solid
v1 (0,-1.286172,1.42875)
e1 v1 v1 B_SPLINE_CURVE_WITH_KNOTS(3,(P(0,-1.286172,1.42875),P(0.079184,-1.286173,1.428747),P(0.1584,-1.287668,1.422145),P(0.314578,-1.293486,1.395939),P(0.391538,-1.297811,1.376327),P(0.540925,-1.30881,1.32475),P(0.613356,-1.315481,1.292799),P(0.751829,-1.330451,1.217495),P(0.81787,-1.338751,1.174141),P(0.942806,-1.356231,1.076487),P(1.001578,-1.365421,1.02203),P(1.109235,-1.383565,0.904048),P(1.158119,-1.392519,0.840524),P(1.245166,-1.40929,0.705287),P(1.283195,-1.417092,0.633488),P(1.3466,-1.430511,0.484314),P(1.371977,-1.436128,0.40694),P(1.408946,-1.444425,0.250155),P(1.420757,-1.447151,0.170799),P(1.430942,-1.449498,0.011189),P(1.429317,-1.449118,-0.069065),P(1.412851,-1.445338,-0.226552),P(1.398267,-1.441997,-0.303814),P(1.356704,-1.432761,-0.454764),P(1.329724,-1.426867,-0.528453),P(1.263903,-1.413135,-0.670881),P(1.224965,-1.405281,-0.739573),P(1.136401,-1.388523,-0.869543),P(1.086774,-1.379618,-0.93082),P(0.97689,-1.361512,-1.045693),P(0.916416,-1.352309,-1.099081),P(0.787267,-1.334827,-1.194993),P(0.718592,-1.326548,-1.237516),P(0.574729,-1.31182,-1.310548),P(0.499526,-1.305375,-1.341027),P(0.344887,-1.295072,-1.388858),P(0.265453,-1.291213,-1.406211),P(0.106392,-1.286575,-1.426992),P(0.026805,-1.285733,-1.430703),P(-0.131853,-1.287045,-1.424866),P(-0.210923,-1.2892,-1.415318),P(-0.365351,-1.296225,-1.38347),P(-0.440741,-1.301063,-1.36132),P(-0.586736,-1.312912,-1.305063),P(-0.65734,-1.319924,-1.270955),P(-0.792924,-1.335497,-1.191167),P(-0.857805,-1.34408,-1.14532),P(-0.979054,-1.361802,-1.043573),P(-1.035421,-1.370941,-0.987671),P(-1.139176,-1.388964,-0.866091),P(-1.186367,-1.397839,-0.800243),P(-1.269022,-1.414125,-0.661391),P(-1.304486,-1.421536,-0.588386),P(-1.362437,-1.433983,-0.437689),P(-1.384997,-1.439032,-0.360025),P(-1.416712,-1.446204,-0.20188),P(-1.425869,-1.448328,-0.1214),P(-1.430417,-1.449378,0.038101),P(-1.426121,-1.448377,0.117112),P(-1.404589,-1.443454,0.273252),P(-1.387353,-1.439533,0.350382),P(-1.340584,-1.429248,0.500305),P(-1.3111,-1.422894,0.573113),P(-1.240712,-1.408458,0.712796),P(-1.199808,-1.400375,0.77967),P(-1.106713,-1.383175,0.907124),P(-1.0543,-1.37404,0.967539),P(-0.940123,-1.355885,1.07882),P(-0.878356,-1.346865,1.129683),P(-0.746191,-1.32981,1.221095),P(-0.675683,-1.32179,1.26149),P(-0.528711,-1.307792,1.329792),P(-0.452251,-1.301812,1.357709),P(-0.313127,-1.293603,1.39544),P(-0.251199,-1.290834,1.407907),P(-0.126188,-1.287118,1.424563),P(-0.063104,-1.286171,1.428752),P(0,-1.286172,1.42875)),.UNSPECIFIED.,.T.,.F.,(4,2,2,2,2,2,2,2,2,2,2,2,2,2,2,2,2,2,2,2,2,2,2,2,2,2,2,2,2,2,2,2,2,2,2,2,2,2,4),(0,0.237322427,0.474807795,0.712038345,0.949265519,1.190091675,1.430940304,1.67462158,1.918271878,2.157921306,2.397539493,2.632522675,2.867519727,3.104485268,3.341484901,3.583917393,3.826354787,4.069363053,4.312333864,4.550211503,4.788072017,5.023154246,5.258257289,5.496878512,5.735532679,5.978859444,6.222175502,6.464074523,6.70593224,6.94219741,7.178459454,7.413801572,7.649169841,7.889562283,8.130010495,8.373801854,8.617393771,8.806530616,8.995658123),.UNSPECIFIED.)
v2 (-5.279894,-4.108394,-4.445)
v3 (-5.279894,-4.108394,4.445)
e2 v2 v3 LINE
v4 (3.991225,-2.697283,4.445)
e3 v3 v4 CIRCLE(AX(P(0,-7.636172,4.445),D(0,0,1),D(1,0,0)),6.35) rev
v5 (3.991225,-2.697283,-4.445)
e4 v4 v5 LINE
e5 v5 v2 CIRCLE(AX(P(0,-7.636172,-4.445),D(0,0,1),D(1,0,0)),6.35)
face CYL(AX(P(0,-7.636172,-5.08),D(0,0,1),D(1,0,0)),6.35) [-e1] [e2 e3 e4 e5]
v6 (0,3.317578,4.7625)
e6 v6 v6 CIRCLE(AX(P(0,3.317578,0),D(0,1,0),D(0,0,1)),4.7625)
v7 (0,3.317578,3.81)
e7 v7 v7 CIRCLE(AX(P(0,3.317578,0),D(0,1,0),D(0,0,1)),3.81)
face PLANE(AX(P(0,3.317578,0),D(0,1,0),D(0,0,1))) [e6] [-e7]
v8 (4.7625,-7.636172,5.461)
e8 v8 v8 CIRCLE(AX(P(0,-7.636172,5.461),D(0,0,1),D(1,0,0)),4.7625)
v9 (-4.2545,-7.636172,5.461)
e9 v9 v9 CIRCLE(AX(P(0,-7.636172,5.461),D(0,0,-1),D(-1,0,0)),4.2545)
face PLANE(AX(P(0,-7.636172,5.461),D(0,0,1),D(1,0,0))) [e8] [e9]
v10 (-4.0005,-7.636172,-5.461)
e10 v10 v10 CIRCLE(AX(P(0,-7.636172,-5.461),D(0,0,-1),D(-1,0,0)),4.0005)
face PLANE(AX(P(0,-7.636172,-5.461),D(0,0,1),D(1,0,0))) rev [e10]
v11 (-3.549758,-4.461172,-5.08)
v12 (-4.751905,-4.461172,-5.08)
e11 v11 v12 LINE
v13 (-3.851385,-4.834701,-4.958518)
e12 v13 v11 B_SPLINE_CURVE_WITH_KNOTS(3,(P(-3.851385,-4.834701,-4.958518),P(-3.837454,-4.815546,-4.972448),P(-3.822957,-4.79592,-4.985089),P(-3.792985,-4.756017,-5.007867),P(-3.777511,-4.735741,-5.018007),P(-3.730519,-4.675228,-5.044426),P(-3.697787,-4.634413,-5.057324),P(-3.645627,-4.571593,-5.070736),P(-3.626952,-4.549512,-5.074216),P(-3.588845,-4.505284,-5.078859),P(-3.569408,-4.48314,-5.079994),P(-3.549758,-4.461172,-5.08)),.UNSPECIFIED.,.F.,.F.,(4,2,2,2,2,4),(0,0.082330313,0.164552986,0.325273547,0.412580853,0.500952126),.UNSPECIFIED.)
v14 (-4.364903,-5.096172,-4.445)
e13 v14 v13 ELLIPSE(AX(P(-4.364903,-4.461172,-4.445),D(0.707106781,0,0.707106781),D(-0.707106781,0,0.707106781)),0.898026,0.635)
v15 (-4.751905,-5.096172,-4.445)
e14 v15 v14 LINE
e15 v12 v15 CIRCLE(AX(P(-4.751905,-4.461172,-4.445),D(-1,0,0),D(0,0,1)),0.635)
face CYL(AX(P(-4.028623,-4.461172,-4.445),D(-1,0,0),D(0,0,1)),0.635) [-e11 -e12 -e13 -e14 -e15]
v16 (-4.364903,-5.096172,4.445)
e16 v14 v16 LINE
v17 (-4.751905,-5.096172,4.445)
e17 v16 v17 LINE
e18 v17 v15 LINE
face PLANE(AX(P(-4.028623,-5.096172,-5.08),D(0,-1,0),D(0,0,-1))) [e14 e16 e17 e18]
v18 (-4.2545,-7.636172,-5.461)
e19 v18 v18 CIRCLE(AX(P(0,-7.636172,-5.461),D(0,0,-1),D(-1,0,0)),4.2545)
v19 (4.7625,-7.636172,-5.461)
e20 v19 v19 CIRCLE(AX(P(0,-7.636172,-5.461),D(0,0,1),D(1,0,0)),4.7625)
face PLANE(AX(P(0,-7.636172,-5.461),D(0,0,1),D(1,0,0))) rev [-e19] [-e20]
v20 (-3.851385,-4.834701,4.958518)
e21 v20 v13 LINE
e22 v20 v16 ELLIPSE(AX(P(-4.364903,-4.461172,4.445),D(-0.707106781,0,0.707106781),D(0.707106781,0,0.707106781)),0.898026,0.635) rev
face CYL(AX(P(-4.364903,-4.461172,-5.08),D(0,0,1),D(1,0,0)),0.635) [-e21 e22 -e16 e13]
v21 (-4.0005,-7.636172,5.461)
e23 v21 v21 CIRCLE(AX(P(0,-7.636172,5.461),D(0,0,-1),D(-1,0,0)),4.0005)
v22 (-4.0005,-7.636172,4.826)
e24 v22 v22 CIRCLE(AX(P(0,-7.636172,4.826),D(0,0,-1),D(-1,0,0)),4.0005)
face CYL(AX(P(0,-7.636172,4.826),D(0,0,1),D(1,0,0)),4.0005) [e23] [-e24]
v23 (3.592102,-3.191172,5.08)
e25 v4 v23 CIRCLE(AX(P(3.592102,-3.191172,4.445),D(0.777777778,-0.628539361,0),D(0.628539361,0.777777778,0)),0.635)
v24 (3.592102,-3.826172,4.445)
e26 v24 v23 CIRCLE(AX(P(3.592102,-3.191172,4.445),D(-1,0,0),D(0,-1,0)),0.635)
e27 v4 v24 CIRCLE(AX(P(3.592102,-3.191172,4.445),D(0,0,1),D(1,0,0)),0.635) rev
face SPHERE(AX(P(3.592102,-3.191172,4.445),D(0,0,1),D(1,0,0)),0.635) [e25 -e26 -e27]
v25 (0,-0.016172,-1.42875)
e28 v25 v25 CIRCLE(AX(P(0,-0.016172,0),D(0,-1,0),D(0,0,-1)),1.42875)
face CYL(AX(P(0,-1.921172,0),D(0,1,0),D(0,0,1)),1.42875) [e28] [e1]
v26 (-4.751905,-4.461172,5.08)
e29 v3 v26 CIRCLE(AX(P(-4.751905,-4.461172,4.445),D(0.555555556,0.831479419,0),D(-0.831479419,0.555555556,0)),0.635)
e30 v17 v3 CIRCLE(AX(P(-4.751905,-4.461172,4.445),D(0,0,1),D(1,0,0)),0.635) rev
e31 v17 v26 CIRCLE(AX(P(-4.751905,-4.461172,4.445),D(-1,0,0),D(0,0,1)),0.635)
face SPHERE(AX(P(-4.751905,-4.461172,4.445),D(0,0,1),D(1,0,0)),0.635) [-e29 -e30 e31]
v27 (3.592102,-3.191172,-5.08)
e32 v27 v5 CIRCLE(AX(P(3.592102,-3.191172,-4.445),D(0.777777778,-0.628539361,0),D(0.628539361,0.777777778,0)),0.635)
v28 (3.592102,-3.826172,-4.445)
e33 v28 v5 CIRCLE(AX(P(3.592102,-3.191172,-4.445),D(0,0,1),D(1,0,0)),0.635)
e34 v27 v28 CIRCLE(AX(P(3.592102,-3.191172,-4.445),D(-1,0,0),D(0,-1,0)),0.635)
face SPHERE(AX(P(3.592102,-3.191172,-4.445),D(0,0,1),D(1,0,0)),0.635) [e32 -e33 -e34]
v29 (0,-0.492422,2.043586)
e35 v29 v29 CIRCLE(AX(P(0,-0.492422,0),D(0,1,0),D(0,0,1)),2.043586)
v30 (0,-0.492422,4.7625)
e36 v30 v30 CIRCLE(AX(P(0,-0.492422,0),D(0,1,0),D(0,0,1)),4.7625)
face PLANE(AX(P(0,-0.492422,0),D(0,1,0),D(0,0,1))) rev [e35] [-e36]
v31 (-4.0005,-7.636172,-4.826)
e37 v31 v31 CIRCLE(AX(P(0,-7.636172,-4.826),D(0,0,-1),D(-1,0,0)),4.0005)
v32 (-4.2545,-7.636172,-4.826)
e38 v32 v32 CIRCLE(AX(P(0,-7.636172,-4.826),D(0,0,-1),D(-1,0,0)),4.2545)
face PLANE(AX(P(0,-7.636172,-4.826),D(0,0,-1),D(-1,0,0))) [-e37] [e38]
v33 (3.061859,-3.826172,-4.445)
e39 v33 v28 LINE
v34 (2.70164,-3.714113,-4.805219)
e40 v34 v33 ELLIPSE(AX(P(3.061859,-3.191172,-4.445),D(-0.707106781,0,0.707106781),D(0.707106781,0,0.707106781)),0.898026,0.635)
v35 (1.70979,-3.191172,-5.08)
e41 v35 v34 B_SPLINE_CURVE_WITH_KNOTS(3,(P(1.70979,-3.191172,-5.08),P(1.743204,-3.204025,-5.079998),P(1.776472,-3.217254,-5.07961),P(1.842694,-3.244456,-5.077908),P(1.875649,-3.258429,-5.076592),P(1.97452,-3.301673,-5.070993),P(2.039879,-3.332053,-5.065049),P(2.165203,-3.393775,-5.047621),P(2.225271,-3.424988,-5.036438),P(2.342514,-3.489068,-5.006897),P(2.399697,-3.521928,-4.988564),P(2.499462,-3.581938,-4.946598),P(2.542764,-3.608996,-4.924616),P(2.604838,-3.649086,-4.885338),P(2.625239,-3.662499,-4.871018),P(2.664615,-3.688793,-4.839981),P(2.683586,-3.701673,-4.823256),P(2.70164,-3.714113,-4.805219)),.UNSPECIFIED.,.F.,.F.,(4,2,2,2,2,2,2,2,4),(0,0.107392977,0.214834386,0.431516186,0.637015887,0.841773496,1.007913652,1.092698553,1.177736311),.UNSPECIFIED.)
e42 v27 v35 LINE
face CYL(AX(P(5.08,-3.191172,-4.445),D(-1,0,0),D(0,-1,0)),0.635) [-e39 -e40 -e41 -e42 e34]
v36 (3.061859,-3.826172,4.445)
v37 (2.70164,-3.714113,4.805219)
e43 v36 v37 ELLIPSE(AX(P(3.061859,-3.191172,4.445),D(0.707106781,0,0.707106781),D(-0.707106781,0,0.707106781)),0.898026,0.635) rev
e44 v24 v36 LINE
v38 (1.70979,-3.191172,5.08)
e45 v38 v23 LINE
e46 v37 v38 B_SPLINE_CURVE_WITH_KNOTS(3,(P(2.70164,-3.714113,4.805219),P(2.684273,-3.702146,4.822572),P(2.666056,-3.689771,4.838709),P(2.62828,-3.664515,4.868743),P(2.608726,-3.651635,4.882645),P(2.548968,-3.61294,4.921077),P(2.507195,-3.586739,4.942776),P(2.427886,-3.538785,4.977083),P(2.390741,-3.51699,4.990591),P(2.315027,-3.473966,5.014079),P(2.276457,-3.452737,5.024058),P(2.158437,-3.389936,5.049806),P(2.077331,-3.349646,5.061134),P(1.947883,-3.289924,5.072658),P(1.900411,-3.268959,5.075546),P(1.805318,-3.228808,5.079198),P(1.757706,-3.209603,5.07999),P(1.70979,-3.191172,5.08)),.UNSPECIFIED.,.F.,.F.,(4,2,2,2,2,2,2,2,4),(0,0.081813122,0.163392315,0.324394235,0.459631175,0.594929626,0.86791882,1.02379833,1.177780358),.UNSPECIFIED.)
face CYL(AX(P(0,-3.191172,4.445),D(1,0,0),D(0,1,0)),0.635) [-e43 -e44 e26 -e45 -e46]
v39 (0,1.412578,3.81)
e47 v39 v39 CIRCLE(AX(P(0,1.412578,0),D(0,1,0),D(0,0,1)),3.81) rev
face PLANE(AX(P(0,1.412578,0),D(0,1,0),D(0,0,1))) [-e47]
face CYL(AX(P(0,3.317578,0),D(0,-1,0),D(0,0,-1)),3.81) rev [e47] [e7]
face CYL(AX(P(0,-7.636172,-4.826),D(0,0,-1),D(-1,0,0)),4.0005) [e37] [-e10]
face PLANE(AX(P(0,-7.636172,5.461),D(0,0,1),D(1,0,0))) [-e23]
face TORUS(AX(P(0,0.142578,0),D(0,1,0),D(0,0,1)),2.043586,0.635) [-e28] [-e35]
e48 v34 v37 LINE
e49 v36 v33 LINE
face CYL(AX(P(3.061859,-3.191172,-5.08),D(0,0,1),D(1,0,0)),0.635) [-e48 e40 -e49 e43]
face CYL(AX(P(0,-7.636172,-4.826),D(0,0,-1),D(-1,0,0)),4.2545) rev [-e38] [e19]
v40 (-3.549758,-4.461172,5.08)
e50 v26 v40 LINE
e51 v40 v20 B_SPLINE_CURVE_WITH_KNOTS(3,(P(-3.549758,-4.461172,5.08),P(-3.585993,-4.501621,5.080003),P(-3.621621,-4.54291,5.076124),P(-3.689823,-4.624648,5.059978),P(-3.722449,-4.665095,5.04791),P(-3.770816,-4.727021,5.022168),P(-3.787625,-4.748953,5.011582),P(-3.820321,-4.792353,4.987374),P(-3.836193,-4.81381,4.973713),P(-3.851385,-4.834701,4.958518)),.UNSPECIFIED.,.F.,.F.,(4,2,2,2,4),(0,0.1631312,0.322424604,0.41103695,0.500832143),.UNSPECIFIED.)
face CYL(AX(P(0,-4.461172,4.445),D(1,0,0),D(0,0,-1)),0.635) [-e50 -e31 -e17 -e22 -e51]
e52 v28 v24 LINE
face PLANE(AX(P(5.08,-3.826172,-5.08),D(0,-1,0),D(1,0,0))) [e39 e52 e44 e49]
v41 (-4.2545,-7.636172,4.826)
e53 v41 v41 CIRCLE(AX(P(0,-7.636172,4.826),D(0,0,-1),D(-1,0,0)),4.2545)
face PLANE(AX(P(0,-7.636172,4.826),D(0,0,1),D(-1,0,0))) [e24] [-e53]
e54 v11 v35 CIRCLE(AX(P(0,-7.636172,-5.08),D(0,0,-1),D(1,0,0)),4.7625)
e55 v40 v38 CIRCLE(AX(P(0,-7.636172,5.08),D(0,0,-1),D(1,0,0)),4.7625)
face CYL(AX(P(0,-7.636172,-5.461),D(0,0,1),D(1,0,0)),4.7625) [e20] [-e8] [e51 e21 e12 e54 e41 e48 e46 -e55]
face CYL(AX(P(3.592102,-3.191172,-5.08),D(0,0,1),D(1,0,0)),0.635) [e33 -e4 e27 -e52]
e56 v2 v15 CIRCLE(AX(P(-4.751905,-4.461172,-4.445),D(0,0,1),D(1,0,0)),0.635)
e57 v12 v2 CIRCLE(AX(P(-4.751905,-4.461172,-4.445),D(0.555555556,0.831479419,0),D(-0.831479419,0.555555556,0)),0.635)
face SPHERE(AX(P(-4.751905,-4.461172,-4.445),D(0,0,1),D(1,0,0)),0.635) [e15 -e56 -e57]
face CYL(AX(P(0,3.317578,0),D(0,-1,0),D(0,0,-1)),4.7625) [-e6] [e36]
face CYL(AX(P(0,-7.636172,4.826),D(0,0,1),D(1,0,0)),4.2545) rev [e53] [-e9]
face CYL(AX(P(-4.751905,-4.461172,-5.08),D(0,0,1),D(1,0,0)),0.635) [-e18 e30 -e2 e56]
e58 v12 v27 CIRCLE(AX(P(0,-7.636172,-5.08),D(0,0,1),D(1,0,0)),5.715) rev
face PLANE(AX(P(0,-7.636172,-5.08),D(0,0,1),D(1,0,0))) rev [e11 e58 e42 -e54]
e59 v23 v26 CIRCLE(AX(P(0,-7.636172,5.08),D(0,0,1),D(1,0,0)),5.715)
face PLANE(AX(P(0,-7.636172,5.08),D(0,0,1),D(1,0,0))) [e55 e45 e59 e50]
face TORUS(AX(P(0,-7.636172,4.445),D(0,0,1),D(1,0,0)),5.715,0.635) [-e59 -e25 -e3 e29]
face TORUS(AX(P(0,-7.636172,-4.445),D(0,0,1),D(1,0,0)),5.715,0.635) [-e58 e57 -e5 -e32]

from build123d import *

# Parameters (mm, degrees)
SKETCH1_R                = 2.54
BOSS_EXTRUDE1_DEPTH      = 1.27
SKETCH2_R                = 3.175
SKETCH2_R_2              = 2.54
BOSS_EXTRUDE2_DEPTH      = 2.54
SKETCH3_R                = 0.9525
CUT_EXTRUDE1_DEPTH       = 0.3175
SCALE1_SCALE             = 1.5
FILLET1_R                = 0.635
SKETCH5_R                = 1.42875
BOSS_EXTRUDE3_DEPTH      = 1.905
BOSS_EXTRUDE4_DEPTH      = 5.08
BOSS_EXTRUDE4_DEPTH_BACK = 5.08
FILLET2_R                = 0.635
BOSS_EXTRUDE5_DEPTH      = 5.461
BOSS_EXTRUDE5_DEPTH_BACK = 5.461
SKETCH9_R                = 4.7625
SKETCH10_R               = 4.2545
SKETCH10_R_2             = 4.0005
CUT_EXTRUDE3_DEPTH       = 0.635
FILLET3_R                = 0.635


with BuildPart() as part:
    # Sketch1 → Boss-Extrude1 (new body)
    with BuildSketch(Plane(origin=(0, 0, 0), x_dir=(1, 0, 0), z_dir=(0, 1, 0))):
        with Locations(Location((0, 0, 0), (0, 0, 270))):
            Circle(SKETCH1_R)
    extrude(amount=BOSS_EXTRUDE1_DEPTH)

    # Sketch2 → Boss-Extrude2 (add)
    with BuildSketch(Plane(origin=(0, 0, 0), x_dir=(1, 0, 0), z_dir=(0, 1, 0))):
        with Locations(Location((0, 0, 0), (0, 0, 270))):
            Circle(SKETCH2_R)
        with Locations(Location((0, 0, 0), (0, 0, 270))):
            Circle(SKETCH2_R_2, mode=Mode.SUBTRACT)
    extrude(amount=BOSS_EXTRUDE2_DEPTH)

    # Sketch3 → Cut-Extrude1 (cut)
    with BuildSketch(Plane.XZ):
        with Locations(Location((0, 0, 0), (0, 0, 270))):
            Circle(SKETCH3_R)
    extrude(amount=-CUT_EXTRUDE1_DEPTH, mode=Mode.SUBTRACT)


with BuildPart() as part_1:
    # Scale1: scaled about (0, 0.984843458, 0)
    add(part.part.scale(SCALE1_SCALE).moved(Location((0, -0.492421729, 0))))

    # Fillet1
    # the kernel refuses this fillet: 0.635 mm, written as the material it takes off along each edge
    with BuildSketch(Plane(origin=(0, -0.492421729, 0), x_dir=(0, 0, -1), z_dir=(-1, 0, 0))) as fillet1_piece_1:
        with BuildLine():
            CenterArc((2.043586106, -0.635), FILLET1_R, 90, 75.522487814)
            Line((1.42875, -0.47625), (1.416453278, -0.473075))
            ThreePointArc((1.416453278, -0.473075), (1.41605, -0.238125), (1.41605, 0))
            Line((1.41605, 0), (1.42875, 0.0127))
            Line((1.42875, 0.0127), (2.043586106, 0.0127))
            Line((2.043586106, 0.0127), (2.043586106, 0))
        make_face()
    revolve(axis=Axis((0, -0.492421729, 0), (0, -1, 0)), mode=Mode.SUBTRACT)

    # Sketch5 → Boss-Extrude3 (add)
    with BuildSketch(Plane.XZ.offset(0.016171729)):
        with Locations(Location((0, 0, 0), (0, 0, 90))):
            Circle(SKETCH5_R)
    extrude(amount=BOSS_EXTRUDE3_DEPTH)

    # Sketch7 → Boss-Extrude4 (add, two sides: drawn at the far end of the back side and taken through both)
    with BuildSketch(Plane.XY.offset(-BOSS_EXTRUDE4_DEPTH_BACK)):
        with BuildLine():
            Line((5.08, -3.826171729), (2.8575, -3.826171729))
            ThreePointArc((2.8575, -3.826171729), (-0.863775136, -2.952658223), (-4.028623369, -5.096171729))
            Line((-4.028623369, -5.096171729), (-5.819871133, -5.096171729))
            ThreePointArc((-5.819871133, -5.096171729), (-0.734899533, -1.328840861), (5.08, -3.826171729))
        make_face()
    extrude(amount=BOSS_EXTRUDE4_DEPTH + BOSS_EXTRUDE4_DEPTH_BACK)

    # Fillet2
    fillet2_edges = [part_1.edges().sort_by_distance(p)[0] for p in [
        (-5.819871133, -5.096171729, 0),
        (5.08, -3.826171729, 0),
        (2.8575, -3.826171729, 0),
        (-4.028623369, -5.096171729, 0),
    ]]
    fillet(fillet2_edges, radius=FILLET2_R)

    # Sketch9 → Boss-Extrude5 (add, two sides: drawn at the far end of the back side and taken through both)
    with BuildSketch(Plane.XY.offset(-BOSS_EXTRUDE5_DEPTH_BACK)):
        with Locations((0, -7.636171729)):
            Circle(SKETCH9_R)
    extrude(amount=BOSS_EXTRUDE5_DEPTH + BOSS_EXTRUDE5_DEPTH_BACK)

    # Sketch10 → Cut-Extrude3 (cut)
    with BuildSketch(Plane(origin=(0, 0, -5.461), x_dir=(-1, 0, 0), z_dir=(0, 0, -1))):
        with Locations((0, -7.636171729)):
            Circle(SKETCH10_R)
        with Locations((0, -7.636171729)):
            Circle(SKETCH10_R_2, mode=Mode.SUBTRACT)
    cut_extrude3 = extrude(amount=-CUT_EXTRUDE3_DEPTH, mode=Mode.SUBTRACT)

    # Mirror1: Cut-Extrude3 across plane
    add(cut_extrude3.mirror(Plane.XY), mode=Mode.SUBTRACT)

    # Fillet3
    # the kernel refuses this fillet: 0.635 mm, written as the material it takes off along each edge
    with BuildSketch(Plane(origin=(3.592102448, -3.826171729, 5.08), x_dir=(0, 1, 0), z_dir=(-1, 0, 0))) as fillet3_piece_1_section:
        with BuildLine():
            CenterArc((FILLET3_R, FILLET3_R), FILLET3_R, 180, 90)
            Line((0, FILLET3_R), (0, 0))
            Line((0, 0), (FILLET3_R, 0))
        make_face()
    fillet3_piece_1 = extrude(amount=2.117743332, mode=Mode.PRIVATE)
    fillet3_piece_1 = fillet3_piece_1 - Plane(origin=(0, -7.636171729, 5.008990652), x_dir=(1, 0, 0), z_dir=(0, 0, -1)) * Cylinder(4.7625, 7, mode=Mode.PRIVATE)
    add(fillet3_piece_1, mode=Mode.SUBTRACT)
    with BuildSketch(Plane(origin=(3.592102448, -3.191171729, 5.08), x_dir=(0.6285393610547108, 0.7777777777777762, 0), z_dir=(-0.7777777777777762, 0.6285393610547108, 0))) as fillet3_piece_2:
        with BuildLine():
            CenterArc((0.635 - FILLET3_R, FILLET3_R), FILLET3_R, 270, 90)
            Line((0.635, FILLET3_R), (0.635, 0))
            Line((0.635, 0), (0.635 - FILLET3_R, 0))
        make_face()
    revolve(axis=Axis((3.592102448, -3.191171729, 5.08), (0, 0, -1)), revolution_arc=141.057558731, mode=Mode.SUBTRACT)
    with BuildSketch(Plane(origin=(-2.777403349, -5.096171729, 5.08), x_dir=(0, 1, 0), z_dir=(-1, 0, 0))) as fillet3_piece_3_section:
        with BuildLine():
            CenterArc((FILLET3_R, FILLET3_R), FILLET3_R, 180, 90)
            Line((0, FILLET3_R), (0, 0))
            Line((0, 0), (FILLET3_R, 0))
        make_face()
    fillet3_piece_3 = extrude(amount=1.974501532, mode=Mode.PRIVATE)
    fillet3_piece_3 = fillet3_piece_3 - Plane(origin=(0, -7.636171729, 4.983808313), x_dir=(1, 0, 0), z_dir=(0, 0, -1)) * Cylinder(4.7625, 7, mode=Mode.PRIVATE)
    add(fillet3_piece_3, mode=Mode.SUBTRACT)
    with BuildSketch(Plane(origin=(-4.751904881, -4.461171729, 5.08), x_dir=(-0.8314794192830989, 0.5555555555555544, 0), z_dir=(0.5555555555555544, 0.8314794192830989, 0))) as fillet3_piece_4:
        with BuildLine():
            CenterArc((0.635 - FILLET3_R, -FILLET3_R), FILLET3_R, 0, 90)
            Line((0.635, -FILLET3_R), (0.635, 0))
            Line((0.635, 0), (0.635 - FILLET3_R, 0))
        make_face()
    revolve(axis=Axis((-4.751904881, -4.461171729, 5.08), (0, 0, 1)), revolution_arc=123.748988596, mode=Mode.SUBTRACT)
    with BuildSketch(Plane(origin=(3.592102448, -3.826171729, -5.08), x_dir=(0, 1, 0), z_dir=(-1, 0, 0))) as fillet3_piece_5_section:
        with BuildLine():
            CenterArc((FILLET3_R, -FILLET3_R), FILLET3_R, 90, 90)
            Line((0, -FILLET3_R), (0, 0))
            Line((0, 0), (FILLET3_R, 0))
        make_face()
    fillet3_piece_5 = extrude(amount=2.117743332, mode=Mode.PRIVATE)
    fillet3_piece_5 = fillet3_piece_5 - Plane(origin=(0, -7.636171729, -5.008990652), x_dir=(1, 0, 0), z_dir=(0, 0, -1)) * Cylinder(4.7625, 7, mode=Mode.PRIVATE)
    add(fillet3_piece_5, mode=Mode.SUBTRACT)
    with BuildSketch(Plane(origin=(3.592102448, -3.191171729, -5.08), x_dir=(0.6285393610547108, 0.7777777777777762, 0), z_dir=(-0.7777777777777762, 0.6285393610547108, 0))) as fillet3_piece_6:
        with BuildLine():
            CenterArc((0.635 - FILLET3_R, -FILLET3_R), FILLET3_R, 0, 90)
            Line((0.635 - FILLET3_R, 0), (0.635, 0))
            Line((0.635, 0), (0.635, -FILLET3_R))
        make_face()
    revolve(axis=Axis((3.592102448, -3.191171729, -5.08), (0, 0, -1)), revolution_arc=141.057558731, mode=Mode.SUBTRACT)
    with BuildSketch(Plane(origin=(-2.777403349, -5.096171729, -5.08), x_dir=(0, 1, 0), z_dir=(-1, 0, 0))) as fillet3_piece_7_section:
        with BuildLine():
            CenterArc((FILLET3_R, -FILLET3_R), FILLET3_R, 90, 90)
            Line((0, -FILLET3_R), (0, 0))
            Line((0, 0), (FILLET3_R, 0))
        make_face()
    fillet3_piece_7 = extrude(amount=1.974501532, mode=Mode.PRIVATE)
    fillet3_piece_7 = fillet3_piece_7 - Plane(origin=(0, -7.636171729, -4.983808313), x_dir=(1, 0, 0), z_dir=(0, 0, -1)) * Cylinder(4.7625, 7, mode=Mode.PRIVATE)
    add(fillet3_piece_7, mode=Mode.SUBTRACT)
    with BuildSketch(Plane(origin=(-4.751904881, -4.461171729, -5.08), x_dir=(-0.8314794192830989, 0.5555555555555544, 0), z_dir=(0.5555555555555544, 0.8314794192830989, 0))) as fillet3_piece_8:
        with BuildLine():
            CenterArc((0.635 - FILLET3_R, FILLET3_R), FILLET3_R, 270, 90)
            Line((0.635 - FILLET3_R, 0), (0.635, 0))
            Line((0.635, 0), (0.635, FILLET3_R))
        make_face()
    revolve(axis=Axis((-4.751904881, -4.461171729, -5.08), (0, 0, 1)), revolution_arc=123.748988596, mode=Mode.SUBTRACT)
    with BuildSketch(Plane(origin=(0, -7.636171729, 5.08), x_dir=(-0.8314794192830981, 0.5555555555555554, 0), z_dir=(-0.5555555555555554, -0.8314794192830981, 0))) as fillet3_piece_9:
        with BuildLine():
            CenterArc((6.35 - FILLET3_R, FILLET3_R), FILLET3_R, 270, 90)
            Line((6.35 - FILLET3_R, 0), (6.35, 0))
            Line((6.35, 0), (6.35, FILLET3_R))
        make_face()
    revolve(axis=Axis((0, -7.636171729, 5.08), (0, 0, -1)), revolution_arc=95.193452673, mode=Mode.SUBTRACT)
    with BuildSketch(Plane(origin=(0, -7.636171729, -5.08), x_dir=(-0.8314794192830981, 0.5555555555555554, 0), z_dir=(-0.5555555555555554, -0.8314794192830981, 0))) as fillet3_piece_10:
        with BuildLine():
            CenterArc((6.35 - FILLET3_R, -FILLET3_R), FILLET3_R, 0, 90)
            Line((6.35 - FILLET3_R, 0), (6.35, 0))
            Line((6.35, 0), (6.35, -FILLET3_R))
        make_face()
    revolve(axis=Axis((0, -7.636171729, -5.08), (0, 0, -1)), revolution_arc=95.193452673, mode=Mode.SUBTRACT)


solid = part_1.part
